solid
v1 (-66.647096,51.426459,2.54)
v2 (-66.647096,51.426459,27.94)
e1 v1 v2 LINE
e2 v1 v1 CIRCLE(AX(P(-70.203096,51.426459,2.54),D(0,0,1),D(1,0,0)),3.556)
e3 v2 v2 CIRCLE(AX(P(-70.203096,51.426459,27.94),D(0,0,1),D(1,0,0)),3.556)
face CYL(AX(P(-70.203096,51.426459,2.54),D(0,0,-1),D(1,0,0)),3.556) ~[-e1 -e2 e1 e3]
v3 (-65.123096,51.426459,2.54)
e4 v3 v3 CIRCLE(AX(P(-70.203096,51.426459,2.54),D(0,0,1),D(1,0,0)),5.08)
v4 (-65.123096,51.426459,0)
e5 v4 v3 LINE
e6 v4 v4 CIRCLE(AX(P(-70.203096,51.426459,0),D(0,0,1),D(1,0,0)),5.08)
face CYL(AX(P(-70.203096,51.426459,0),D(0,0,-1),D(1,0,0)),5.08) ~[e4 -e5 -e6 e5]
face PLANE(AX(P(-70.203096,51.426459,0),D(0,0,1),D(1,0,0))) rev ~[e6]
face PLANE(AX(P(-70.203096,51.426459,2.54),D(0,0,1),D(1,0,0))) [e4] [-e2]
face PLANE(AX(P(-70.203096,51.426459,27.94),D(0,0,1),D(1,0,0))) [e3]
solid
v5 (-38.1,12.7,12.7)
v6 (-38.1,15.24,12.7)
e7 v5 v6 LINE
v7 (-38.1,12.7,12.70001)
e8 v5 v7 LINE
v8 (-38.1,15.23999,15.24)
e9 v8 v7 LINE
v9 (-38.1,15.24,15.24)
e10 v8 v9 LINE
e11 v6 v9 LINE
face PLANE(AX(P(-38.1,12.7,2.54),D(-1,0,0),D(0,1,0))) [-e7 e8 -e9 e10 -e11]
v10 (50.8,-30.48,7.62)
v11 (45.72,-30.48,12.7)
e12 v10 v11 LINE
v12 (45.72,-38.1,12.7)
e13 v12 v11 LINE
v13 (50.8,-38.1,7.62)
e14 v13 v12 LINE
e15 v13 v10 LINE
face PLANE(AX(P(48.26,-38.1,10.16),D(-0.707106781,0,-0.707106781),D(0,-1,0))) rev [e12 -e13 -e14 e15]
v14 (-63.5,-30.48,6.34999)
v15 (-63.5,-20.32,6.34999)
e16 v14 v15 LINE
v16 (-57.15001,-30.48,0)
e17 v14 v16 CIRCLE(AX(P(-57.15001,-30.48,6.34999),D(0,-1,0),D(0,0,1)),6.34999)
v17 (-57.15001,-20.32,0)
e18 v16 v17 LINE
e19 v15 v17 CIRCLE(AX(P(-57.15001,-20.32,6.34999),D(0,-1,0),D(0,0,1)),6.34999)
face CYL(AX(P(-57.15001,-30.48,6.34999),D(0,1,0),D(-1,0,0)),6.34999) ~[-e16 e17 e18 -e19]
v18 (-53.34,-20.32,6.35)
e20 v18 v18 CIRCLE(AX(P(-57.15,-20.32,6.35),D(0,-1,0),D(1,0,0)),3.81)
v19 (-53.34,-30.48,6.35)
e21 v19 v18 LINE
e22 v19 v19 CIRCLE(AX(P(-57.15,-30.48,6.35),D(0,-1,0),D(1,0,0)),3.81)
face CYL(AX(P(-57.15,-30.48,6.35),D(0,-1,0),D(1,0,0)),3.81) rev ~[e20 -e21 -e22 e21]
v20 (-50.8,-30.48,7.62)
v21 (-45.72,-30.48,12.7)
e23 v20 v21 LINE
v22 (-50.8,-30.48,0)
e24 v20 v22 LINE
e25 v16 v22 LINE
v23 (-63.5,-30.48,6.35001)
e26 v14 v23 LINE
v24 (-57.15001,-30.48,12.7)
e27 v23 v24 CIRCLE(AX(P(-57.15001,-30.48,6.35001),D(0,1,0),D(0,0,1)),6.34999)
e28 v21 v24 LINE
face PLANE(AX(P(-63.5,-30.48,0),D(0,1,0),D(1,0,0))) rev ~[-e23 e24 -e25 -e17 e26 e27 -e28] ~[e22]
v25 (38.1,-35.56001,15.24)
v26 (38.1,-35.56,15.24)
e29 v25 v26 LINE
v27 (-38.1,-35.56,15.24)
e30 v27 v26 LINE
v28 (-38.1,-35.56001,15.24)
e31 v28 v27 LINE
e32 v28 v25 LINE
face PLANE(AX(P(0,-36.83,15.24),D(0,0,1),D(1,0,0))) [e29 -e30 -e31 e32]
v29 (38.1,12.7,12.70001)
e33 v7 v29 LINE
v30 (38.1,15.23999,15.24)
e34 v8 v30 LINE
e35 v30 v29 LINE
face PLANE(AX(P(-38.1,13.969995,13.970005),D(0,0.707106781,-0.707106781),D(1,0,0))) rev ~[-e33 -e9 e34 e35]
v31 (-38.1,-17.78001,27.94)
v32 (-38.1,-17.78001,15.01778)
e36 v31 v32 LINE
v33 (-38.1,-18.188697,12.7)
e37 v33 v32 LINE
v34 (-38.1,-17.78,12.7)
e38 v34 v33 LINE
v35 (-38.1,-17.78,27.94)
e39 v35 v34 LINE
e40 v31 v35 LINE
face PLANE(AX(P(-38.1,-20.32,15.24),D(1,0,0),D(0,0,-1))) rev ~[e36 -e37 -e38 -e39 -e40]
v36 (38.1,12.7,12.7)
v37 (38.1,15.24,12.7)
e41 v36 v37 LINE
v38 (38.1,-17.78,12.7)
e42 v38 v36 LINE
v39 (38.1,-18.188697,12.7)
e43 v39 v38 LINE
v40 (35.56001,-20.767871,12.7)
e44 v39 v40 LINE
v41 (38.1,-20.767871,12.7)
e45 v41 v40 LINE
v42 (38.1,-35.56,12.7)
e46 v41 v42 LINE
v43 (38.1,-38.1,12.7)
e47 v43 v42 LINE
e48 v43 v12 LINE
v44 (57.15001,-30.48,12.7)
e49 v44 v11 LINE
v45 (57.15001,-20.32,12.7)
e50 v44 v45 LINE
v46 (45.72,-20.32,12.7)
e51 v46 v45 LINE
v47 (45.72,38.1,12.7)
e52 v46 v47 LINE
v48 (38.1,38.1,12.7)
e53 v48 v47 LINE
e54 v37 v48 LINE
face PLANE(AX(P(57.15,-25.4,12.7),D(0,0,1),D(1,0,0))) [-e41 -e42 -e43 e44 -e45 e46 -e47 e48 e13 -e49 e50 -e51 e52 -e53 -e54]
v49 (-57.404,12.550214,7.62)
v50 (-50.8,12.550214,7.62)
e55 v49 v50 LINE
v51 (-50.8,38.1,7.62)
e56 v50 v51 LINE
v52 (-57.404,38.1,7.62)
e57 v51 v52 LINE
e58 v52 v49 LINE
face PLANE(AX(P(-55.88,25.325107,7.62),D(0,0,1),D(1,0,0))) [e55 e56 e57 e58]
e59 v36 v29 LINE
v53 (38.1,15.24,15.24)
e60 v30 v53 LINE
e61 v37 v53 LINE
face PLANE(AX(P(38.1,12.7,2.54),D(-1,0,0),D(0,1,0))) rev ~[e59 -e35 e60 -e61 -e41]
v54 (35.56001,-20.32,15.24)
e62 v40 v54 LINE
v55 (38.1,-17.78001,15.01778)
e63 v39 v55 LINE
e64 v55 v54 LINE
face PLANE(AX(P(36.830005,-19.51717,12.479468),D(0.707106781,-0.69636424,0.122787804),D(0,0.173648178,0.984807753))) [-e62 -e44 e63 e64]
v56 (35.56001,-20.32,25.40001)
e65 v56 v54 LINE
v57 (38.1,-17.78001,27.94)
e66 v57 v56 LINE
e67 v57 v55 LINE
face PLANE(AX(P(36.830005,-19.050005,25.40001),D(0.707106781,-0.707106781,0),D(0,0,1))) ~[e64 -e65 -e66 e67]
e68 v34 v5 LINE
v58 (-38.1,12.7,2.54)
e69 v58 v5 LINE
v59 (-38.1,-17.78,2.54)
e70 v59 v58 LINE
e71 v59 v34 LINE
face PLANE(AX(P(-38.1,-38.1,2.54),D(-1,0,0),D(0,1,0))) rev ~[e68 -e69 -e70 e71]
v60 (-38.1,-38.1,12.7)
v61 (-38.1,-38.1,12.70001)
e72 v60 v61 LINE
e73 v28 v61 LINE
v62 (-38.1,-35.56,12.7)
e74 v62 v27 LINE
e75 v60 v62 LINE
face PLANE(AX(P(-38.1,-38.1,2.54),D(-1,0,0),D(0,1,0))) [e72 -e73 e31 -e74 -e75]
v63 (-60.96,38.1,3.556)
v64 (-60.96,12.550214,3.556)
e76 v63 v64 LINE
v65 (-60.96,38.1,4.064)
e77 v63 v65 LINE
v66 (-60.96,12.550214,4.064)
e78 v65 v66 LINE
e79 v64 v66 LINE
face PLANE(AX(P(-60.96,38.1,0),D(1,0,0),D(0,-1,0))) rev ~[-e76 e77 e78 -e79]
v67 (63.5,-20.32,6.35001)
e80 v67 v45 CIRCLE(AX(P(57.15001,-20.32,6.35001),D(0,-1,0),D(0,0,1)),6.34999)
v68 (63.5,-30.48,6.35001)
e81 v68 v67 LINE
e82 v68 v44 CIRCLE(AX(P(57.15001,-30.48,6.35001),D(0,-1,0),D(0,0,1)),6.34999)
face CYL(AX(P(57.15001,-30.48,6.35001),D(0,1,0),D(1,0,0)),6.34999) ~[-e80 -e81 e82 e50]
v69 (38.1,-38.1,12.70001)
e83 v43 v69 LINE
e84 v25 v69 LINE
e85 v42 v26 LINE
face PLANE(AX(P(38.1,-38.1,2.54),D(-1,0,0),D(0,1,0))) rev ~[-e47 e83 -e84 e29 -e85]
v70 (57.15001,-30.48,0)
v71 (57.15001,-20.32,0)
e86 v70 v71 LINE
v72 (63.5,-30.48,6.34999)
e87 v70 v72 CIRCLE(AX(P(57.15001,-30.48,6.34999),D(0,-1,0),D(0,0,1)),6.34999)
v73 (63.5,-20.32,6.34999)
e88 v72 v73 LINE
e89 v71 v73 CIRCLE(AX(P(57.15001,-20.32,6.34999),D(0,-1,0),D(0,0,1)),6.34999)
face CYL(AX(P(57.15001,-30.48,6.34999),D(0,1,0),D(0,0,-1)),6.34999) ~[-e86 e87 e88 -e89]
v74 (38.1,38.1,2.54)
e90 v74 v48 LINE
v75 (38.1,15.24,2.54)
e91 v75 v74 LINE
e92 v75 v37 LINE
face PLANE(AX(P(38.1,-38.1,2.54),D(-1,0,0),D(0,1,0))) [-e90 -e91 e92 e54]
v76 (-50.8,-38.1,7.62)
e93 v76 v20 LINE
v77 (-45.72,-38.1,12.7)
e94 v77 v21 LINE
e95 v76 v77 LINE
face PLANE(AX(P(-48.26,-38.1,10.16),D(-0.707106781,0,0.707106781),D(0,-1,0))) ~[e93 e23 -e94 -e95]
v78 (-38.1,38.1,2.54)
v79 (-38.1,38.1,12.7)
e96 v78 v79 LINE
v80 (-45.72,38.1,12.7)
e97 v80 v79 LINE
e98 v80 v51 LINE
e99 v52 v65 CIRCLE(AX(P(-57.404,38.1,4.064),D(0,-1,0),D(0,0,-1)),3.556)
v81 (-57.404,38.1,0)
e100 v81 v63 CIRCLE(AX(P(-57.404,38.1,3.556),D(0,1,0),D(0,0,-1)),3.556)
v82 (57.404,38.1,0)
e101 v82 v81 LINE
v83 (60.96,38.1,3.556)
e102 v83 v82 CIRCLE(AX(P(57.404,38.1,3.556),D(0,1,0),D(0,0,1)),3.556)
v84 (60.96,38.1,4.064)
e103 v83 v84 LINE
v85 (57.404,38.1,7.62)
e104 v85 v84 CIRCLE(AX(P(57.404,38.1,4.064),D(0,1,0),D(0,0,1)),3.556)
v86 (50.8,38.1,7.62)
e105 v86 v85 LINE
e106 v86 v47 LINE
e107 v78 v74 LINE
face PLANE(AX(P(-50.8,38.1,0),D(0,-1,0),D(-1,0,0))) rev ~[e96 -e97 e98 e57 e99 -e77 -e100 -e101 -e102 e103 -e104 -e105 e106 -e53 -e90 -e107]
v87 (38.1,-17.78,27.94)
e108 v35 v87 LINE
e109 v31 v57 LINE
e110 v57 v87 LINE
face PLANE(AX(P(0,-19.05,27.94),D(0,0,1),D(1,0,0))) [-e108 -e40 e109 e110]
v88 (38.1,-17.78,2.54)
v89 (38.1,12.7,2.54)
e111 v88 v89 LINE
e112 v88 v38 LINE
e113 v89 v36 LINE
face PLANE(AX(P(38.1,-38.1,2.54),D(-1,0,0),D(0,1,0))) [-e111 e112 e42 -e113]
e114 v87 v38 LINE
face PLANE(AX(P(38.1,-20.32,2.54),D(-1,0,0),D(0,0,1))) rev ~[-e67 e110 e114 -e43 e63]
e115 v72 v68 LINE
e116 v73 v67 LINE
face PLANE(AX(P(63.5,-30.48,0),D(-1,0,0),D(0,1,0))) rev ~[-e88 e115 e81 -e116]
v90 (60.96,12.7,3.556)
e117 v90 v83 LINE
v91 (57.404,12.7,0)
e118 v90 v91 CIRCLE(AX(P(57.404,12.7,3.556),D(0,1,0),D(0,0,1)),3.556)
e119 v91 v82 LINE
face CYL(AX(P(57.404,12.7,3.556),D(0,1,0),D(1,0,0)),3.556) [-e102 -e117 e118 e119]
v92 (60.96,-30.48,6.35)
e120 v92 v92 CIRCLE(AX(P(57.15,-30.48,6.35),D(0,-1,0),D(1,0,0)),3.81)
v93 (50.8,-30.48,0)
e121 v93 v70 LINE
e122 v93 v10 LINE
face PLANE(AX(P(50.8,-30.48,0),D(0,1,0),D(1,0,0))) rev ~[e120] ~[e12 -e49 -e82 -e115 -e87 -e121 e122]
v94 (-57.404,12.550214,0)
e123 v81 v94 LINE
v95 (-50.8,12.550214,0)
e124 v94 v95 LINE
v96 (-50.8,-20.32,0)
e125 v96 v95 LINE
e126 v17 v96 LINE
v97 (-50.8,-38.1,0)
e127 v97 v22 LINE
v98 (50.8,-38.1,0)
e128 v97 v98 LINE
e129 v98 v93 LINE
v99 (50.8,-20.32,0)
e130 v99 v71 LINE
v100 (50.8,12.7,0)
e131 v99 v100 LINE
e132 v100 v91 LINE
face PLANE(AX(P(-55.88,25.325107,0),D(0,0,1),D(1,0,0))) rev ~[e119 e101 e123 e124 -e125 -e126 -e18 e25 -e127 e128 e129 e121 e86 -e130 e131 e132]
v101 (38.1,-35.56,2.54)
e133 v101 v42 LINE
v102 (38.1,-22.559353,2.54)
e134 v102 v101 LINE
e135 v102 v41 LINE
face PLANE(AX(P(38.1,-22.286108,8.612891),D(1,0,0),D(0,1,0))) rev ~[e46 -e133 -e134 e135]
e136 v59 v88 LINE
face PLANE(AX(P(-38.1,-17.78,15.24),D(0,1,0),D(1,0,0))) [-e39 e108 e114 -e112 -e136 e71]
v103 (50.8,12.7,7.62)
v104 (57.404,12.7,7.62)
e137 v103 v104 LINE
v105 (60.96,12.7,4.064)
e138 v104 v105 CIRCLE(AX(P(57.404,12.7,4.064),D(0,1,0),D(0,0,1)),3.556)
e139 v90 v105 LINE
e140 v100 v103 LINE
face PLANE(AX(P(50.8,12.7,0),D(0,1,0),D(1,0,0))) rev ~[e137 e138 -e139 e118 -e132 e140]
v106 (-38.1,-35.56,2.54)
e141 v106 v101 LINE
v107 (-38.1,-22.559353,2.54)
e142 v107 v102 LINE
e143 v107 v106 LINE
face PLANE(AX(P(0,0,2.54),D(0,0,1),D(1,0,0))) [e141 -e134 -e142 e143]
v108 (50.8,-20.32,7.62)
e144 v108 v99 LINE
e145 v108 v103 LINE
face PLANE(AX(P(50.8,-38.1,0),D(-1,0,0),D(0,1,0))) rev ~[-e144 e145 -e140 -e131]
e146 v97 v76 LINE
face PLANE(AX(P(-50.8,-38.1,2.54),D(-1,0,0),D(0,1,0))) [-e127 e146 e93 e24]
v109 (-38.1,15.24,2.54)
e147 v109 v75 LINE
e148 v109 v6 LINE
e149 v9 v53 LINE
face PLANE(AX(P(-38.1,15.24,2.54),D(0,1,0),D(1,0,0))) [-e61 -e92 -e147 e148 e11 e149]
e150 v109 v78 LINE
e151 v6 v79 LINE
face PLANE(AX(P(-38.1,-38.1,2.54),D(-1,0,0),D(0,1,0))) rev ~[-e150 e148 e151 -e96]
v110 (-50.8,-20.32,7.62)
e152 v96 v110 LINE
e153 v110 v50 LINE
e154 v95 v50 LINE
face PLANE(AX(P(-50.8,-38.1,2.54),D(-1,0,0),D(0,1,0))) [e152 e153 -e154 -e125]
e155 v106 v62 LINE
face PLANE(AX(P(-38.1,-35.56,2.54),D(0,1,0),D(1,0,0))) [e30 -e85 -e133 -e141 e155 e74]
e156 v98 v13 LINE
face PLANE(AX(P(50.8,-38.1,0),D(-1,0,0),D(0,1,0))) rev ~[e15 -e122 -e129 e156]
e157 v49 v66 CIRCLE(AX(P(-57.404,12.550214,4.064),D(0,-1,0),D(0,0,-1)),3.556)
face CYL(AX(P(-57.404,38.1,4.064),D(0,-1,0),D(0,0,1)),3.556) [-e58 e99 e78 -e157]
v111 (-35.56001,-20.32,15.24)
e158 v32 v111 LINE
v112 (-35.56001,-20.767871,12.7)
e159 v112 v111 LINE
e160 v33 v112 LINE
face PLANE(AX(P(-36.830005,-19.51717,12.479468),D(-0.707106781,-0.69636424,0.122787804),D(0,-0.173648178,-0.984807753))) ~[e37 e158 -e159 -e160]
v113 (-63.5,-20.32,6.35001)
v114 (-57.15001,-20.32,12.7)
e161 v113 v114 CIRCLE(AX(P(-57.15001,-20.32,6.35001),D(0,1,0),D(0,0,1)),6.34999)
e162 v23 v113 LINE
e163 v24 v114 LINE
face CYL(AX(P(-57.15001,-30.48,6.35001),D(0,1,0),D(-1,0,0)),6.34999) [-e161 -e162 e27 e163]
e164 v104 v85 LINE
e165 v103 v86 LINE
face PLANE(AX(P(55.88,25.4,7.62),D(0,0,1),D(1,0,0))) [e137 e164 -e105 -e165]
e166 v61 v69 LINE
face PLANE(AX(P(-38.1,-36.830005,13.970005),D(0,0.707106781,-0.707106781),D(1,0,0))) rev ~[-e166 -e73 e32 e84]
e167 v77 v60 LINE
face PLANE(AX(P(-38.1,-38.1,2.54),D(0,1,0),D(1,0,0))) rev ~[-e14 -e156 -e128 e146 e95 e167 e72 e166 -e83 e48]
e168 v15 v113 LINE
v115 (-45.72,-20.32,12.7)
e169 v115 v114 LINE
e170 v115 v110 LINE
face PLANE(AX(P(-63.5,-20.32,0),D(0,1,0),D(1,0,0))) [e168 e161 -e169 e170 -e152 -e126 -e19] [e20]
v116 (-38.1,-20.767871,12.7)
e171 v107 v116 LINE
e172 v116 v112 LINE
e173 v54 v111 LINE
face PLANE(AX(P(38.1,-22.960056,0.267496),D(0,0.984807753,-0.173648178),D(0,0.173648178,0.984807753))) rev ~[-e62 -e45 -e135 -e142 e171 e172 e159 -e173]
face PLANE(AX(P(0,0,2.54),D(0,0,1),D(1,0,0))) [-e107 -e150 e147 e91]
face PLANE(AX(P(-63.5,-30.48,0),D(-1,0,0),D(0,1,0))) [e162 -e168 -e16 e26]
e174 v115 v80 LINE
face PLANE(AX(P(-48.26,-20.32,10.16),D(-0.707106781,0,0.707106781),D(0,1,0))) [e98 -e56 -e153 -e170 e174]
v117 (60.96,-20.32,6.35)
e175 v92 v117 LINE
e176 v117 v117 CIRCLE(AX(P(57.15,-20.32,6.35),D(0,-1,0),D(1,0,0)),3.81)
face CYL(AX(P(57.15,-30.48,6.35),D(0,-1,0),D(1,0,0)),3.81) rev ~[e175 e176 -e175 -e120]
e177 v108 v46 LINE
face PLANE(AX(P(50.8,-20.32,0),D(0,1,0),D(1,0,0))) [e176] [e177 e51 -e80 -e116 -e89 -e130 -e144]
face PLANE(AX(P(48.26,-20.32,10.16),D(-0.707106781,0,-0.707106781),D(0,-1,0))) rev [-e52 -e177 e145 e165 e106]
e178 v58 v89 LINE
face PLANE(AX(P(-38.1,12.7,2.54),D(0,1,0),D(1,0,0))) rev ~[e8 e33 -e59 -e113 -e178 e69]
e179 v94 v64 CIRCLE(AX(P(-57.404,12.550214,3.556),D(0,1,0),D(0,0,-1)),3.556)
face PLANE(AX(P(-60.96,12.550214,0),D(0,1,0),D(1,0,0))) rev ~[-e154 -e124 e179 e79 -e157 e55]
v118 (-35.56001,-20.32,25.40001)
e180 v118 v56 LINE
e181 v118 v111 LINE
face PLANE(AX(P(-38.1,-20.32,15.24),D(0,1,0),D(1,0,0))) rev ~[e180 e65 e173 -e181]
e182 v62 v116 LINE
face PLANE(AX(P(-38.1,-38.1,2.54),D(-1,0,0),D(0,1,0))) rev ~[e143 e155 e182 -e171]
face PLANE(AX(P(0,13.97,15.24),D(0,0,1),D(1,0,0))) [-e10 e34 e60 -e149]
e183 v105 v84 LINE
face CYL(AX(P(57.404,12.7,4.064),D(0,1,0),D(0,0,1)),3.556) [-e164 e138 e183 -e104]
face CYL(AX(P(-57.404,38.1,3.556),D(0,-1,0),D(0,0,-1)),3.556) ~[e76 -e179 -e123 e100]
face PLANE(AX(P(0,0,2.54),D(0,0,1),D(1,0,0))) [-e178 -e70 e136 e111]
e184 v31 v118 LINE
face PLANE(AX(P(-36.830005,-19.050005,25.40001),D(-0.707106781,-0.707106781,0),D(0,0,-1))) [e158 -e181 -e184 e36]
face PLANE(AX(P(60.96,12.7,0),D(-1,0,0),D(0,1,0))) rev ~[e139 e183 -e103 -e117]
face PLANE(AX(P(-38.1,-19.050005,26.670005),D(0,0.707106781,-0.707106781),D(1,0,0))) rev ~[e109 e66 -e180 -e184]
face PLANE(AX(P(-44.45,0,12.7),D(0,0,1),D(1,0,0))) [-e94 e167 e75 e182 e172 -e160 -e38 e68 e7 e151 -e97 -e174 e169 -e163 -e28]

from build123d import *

# Parameters (mm, degrees)
F0_W         = 101.6
F0_H         = 76.2
F1_DEPTH     = 2.54
F2_W         = 12.7
F2_H         = 10.16
F3_DEPTH     = 12.7
F4_R         = 6.34999
F5_R         = 3.81
F6_DEPTH     = 25.4
F7_W         = 12.7
F7_H         = 76.2
F8_DEPTH     = 10.16
F9_SIZE      = 5.08
F10_W        = 76.2
F10_H        = 2.54
F11_DEPTH    = 12.7
F12_DEPTH    = 12.7
F14_DEPTH    = 2.54
F15_T4_DEPTH = 76.2
F16_SIZE     = 2.53999
F17_SIZE     = 2.53999
F18_R        = 5.08
F19_DEPTH    = 2.54
F20_R        = 3.556
F21_DEPTH    = 25.4
F22_W        = 10.16
F22_H        = 25.4
F23_DEPTH    = 7.62
F24_R        = 3.556


# Not quite as in the source:
# - a fillet or chamfer that OpenCascade refuses, or shapes differently, is made with other operations: its cross-section is extruded or revolved along the edge and cut away or added
# - a fillet or chamfer is up to 0.001 mm smaller than in the source, because OpenCascade refuses the exact size


with BuildPart() as f1:
    # F0 (on Top) → F1 (new body)
    with BuildSketch(Plane.XY):
        Rectangle(F0_W, F0_H)
    extrude(amount=F1_DEPTH)

    # F2 (on Top) → F3 (join)
    with BuildSketch(Plane.XY):
        with Locations((-57.15, -25.4)):
            Rectangle(F2_W, F2_H)
        with Locations((57.15, -25.4)):
            Rectangle(F2_W, F2_H)
    extrude(amount=F3_DEPTH)

    # F4 (radius 6.35 in the source; OpenCascade refuses exactly that, so slightly less here)
    f4_edges = [f1.edges().sort_by_distance(p)[0] for p in [
        (-63.5, -25.4, 12.7),
        (-63.5, -25.4, 0),
        (63.5, -25.4, 12.7),
        (63.5, -25.4, 0),
    ]]
    fillet(f4_edges, radius=F4_R)

    # F5 (on face) → F6 (cut)
    with BuildSketch(Plane.XZ.offset(30.48)):
        with Locations((-57.15, 6.35)):
            Circle(F5_R)
        with Locations((57.15, 6.35)):
            Circle(F5_R)
    extrude(amount=-F6_DEPTH, mode=Mode.SUBTRACT)

    # F7 (on face) → F8 (join)
    with BuildSketch(Plane.XY.offset(2.54)):
        with Locations((-44.45, 0)):
            Rectangle(F7_W, F7_H)
        with Locations((44.45, 0)):
            Rectangle(F7_W, F7_H)
    extrude(amount=F8_DEPTH)

    # F9
    f9_edges = [f1.edges().sort_by_distance(p)[0] for p in [
        (-50.8, 8.89, 12.7),
        (-50.8, -34.29, 12.7),
        (50.8, 8.89, 12.7),
        (50.8, -34.29, 12.7),
    ]]
    chamfer(f9_edges, length=F9_SIZE)

    # F10 (on face) → F11 (join)
    with BuildSketch(Plane.XY.offset(2.54)):
        with Locations((0, -36.83)):
            Rectangle(F10_W, F10_H)
        with Locations((0, 13.97)):
            Rectangle(F10_W, F10_H)
        with Locations((0, -19.05)):
            Rectangle(F10_W, F10_H)
    extrude(amount=F11_DEPTH)

    # F12 (add): a face of the model
    f12_faces = [f1.faces().sort_by_distance(p)[0] for p in [
        (0, -19.05, 15.24),
    ]]
    extrude(f12_faces, amount=F12_DEPTH)

    # F13 (on face) → F14 (join)
    with BuildSketch(Plane.XZ.offset(20.32)):
        Polygon((-38.1, 12.7), (-38.1, 2.54), (38.1, 2.54), (38.1, 12.7), (38.1, 15.24), (-38.1, 15.24), align=None)
    extrude(amount=F14_DEPTH)

    # F15: chamfer of 2.54 x 14.4050558218 on 1 edges, made by hand


with BuildPart() as f15_tool2:
    # F15_s3 → F15_t4 (new body)
    with BuildSketch(Plane.YZ.offset(38.1)):
        with BuildLine():
            Line((-22.9600564677, 0.2674957519), (-20.2199435323, 15.8074484262))
            Line((-20.2199435323, 15.8074484262), (-20.2199435323, 16.0955495427))
            ThreePointArc((-20.2199435323, 16.0955495427), (-21.5399717661, 15.5281011164), (-22.86, 15.5281011164))
            Line((-22.86, 15.5281011164), (-23.1481011164, 15.24))
            ThreePointArc((-23.1481011164, 15.24), (-23.1481011164, 7.753747876), (-23.2481575841, 0.2674957519))
            Line((-23.2481575841, 0.2674957519), (-22.9600564677, 0.2674957519))
        make_face()
    extrude(amount=-F15_T4_DEPTH)

    split(bisect_by=Plane.XY.offset(2.54), keep=Keep.TOP)

    split(bisect_by=Plane.XZ.offset(20.32), keep=Keep.TOP)


with BuildPart() as f1_1:
    add(f1.part)

    # F15_t1: cut F15_tool2
    add(f15_tool2.part, mode=Mode.SUBTRACT)

    # F16 (size 2.54 in the source; OpenCascade refuses exactly that, so slightly less here)
    f16_edges = [f1_1.edges().sort_by_distance(p)[0] for p in [
        (0, -20.32, 27.94),
        (0, -38.1, 15.24),
        (0, 12.7, 15.24),
    ]]
    chamfer(f16_edges, length=F16_SIZE)

    # F17 (size 2.54 in the source; OpenCascade refuses exactly that, so slightly less here)
    f17_edges = [f1_1.edges().sort_by_distance(p)[0] for p in [
        (-38.1, -20.32, 20.320005),
        (-38.1, -20.543935, 13.97),
        (38.1, -20.32, 20.320005),
        (38.1, -20.543935, 13.97),
    ]]
    chamfer(f17_edges, length=F17_SIZE)

    # F22 (on Top) → F23 (join)
    with BuildSketch(Plane.XY):
        Polygon((-50.8, 12.7), (-50.8, 38.1), (-60.96, 38.1), (-60.96, 12.5502143055), (-50.8, 12.5502143055), align=None)
        with Locations((55.88, 25.4)):
            Rectangle(F22_W, F22_H)
    extrude(amount=F23_DEPTH)

    # F24
    f24_edges = [f1_1.edges().sort_by_distance(p)[0] for p in [
        (-60.96, 25.325107, 7.62),
        (-60.96, 25.325107, 0),
        (60.96, 25.4, 7.62),
        (60.96, 25.4, 0),
    ]]
    fillet(f24_edges, radius=F24_R)


with BuildPart() as f19:
    # F18 (on Top) → F19 (new body)
    with BuildSketch(Plane.XY):
        with Locations((-70.2030956745, 51.4264591038)):
            Circle(F18_R)
    extrude(amount=F19_DEPTH)

    # F20 (on face) → F21 (join)
    with BuildSketch(Plane.XY.offset(2.54)):
        with Locations((-70.2030956745, 51.4264591038)):
            Circle(F20_R)
    extrude(amount=F21_DEPTH)


solid = Compound([f1_1.part, f19.part])
